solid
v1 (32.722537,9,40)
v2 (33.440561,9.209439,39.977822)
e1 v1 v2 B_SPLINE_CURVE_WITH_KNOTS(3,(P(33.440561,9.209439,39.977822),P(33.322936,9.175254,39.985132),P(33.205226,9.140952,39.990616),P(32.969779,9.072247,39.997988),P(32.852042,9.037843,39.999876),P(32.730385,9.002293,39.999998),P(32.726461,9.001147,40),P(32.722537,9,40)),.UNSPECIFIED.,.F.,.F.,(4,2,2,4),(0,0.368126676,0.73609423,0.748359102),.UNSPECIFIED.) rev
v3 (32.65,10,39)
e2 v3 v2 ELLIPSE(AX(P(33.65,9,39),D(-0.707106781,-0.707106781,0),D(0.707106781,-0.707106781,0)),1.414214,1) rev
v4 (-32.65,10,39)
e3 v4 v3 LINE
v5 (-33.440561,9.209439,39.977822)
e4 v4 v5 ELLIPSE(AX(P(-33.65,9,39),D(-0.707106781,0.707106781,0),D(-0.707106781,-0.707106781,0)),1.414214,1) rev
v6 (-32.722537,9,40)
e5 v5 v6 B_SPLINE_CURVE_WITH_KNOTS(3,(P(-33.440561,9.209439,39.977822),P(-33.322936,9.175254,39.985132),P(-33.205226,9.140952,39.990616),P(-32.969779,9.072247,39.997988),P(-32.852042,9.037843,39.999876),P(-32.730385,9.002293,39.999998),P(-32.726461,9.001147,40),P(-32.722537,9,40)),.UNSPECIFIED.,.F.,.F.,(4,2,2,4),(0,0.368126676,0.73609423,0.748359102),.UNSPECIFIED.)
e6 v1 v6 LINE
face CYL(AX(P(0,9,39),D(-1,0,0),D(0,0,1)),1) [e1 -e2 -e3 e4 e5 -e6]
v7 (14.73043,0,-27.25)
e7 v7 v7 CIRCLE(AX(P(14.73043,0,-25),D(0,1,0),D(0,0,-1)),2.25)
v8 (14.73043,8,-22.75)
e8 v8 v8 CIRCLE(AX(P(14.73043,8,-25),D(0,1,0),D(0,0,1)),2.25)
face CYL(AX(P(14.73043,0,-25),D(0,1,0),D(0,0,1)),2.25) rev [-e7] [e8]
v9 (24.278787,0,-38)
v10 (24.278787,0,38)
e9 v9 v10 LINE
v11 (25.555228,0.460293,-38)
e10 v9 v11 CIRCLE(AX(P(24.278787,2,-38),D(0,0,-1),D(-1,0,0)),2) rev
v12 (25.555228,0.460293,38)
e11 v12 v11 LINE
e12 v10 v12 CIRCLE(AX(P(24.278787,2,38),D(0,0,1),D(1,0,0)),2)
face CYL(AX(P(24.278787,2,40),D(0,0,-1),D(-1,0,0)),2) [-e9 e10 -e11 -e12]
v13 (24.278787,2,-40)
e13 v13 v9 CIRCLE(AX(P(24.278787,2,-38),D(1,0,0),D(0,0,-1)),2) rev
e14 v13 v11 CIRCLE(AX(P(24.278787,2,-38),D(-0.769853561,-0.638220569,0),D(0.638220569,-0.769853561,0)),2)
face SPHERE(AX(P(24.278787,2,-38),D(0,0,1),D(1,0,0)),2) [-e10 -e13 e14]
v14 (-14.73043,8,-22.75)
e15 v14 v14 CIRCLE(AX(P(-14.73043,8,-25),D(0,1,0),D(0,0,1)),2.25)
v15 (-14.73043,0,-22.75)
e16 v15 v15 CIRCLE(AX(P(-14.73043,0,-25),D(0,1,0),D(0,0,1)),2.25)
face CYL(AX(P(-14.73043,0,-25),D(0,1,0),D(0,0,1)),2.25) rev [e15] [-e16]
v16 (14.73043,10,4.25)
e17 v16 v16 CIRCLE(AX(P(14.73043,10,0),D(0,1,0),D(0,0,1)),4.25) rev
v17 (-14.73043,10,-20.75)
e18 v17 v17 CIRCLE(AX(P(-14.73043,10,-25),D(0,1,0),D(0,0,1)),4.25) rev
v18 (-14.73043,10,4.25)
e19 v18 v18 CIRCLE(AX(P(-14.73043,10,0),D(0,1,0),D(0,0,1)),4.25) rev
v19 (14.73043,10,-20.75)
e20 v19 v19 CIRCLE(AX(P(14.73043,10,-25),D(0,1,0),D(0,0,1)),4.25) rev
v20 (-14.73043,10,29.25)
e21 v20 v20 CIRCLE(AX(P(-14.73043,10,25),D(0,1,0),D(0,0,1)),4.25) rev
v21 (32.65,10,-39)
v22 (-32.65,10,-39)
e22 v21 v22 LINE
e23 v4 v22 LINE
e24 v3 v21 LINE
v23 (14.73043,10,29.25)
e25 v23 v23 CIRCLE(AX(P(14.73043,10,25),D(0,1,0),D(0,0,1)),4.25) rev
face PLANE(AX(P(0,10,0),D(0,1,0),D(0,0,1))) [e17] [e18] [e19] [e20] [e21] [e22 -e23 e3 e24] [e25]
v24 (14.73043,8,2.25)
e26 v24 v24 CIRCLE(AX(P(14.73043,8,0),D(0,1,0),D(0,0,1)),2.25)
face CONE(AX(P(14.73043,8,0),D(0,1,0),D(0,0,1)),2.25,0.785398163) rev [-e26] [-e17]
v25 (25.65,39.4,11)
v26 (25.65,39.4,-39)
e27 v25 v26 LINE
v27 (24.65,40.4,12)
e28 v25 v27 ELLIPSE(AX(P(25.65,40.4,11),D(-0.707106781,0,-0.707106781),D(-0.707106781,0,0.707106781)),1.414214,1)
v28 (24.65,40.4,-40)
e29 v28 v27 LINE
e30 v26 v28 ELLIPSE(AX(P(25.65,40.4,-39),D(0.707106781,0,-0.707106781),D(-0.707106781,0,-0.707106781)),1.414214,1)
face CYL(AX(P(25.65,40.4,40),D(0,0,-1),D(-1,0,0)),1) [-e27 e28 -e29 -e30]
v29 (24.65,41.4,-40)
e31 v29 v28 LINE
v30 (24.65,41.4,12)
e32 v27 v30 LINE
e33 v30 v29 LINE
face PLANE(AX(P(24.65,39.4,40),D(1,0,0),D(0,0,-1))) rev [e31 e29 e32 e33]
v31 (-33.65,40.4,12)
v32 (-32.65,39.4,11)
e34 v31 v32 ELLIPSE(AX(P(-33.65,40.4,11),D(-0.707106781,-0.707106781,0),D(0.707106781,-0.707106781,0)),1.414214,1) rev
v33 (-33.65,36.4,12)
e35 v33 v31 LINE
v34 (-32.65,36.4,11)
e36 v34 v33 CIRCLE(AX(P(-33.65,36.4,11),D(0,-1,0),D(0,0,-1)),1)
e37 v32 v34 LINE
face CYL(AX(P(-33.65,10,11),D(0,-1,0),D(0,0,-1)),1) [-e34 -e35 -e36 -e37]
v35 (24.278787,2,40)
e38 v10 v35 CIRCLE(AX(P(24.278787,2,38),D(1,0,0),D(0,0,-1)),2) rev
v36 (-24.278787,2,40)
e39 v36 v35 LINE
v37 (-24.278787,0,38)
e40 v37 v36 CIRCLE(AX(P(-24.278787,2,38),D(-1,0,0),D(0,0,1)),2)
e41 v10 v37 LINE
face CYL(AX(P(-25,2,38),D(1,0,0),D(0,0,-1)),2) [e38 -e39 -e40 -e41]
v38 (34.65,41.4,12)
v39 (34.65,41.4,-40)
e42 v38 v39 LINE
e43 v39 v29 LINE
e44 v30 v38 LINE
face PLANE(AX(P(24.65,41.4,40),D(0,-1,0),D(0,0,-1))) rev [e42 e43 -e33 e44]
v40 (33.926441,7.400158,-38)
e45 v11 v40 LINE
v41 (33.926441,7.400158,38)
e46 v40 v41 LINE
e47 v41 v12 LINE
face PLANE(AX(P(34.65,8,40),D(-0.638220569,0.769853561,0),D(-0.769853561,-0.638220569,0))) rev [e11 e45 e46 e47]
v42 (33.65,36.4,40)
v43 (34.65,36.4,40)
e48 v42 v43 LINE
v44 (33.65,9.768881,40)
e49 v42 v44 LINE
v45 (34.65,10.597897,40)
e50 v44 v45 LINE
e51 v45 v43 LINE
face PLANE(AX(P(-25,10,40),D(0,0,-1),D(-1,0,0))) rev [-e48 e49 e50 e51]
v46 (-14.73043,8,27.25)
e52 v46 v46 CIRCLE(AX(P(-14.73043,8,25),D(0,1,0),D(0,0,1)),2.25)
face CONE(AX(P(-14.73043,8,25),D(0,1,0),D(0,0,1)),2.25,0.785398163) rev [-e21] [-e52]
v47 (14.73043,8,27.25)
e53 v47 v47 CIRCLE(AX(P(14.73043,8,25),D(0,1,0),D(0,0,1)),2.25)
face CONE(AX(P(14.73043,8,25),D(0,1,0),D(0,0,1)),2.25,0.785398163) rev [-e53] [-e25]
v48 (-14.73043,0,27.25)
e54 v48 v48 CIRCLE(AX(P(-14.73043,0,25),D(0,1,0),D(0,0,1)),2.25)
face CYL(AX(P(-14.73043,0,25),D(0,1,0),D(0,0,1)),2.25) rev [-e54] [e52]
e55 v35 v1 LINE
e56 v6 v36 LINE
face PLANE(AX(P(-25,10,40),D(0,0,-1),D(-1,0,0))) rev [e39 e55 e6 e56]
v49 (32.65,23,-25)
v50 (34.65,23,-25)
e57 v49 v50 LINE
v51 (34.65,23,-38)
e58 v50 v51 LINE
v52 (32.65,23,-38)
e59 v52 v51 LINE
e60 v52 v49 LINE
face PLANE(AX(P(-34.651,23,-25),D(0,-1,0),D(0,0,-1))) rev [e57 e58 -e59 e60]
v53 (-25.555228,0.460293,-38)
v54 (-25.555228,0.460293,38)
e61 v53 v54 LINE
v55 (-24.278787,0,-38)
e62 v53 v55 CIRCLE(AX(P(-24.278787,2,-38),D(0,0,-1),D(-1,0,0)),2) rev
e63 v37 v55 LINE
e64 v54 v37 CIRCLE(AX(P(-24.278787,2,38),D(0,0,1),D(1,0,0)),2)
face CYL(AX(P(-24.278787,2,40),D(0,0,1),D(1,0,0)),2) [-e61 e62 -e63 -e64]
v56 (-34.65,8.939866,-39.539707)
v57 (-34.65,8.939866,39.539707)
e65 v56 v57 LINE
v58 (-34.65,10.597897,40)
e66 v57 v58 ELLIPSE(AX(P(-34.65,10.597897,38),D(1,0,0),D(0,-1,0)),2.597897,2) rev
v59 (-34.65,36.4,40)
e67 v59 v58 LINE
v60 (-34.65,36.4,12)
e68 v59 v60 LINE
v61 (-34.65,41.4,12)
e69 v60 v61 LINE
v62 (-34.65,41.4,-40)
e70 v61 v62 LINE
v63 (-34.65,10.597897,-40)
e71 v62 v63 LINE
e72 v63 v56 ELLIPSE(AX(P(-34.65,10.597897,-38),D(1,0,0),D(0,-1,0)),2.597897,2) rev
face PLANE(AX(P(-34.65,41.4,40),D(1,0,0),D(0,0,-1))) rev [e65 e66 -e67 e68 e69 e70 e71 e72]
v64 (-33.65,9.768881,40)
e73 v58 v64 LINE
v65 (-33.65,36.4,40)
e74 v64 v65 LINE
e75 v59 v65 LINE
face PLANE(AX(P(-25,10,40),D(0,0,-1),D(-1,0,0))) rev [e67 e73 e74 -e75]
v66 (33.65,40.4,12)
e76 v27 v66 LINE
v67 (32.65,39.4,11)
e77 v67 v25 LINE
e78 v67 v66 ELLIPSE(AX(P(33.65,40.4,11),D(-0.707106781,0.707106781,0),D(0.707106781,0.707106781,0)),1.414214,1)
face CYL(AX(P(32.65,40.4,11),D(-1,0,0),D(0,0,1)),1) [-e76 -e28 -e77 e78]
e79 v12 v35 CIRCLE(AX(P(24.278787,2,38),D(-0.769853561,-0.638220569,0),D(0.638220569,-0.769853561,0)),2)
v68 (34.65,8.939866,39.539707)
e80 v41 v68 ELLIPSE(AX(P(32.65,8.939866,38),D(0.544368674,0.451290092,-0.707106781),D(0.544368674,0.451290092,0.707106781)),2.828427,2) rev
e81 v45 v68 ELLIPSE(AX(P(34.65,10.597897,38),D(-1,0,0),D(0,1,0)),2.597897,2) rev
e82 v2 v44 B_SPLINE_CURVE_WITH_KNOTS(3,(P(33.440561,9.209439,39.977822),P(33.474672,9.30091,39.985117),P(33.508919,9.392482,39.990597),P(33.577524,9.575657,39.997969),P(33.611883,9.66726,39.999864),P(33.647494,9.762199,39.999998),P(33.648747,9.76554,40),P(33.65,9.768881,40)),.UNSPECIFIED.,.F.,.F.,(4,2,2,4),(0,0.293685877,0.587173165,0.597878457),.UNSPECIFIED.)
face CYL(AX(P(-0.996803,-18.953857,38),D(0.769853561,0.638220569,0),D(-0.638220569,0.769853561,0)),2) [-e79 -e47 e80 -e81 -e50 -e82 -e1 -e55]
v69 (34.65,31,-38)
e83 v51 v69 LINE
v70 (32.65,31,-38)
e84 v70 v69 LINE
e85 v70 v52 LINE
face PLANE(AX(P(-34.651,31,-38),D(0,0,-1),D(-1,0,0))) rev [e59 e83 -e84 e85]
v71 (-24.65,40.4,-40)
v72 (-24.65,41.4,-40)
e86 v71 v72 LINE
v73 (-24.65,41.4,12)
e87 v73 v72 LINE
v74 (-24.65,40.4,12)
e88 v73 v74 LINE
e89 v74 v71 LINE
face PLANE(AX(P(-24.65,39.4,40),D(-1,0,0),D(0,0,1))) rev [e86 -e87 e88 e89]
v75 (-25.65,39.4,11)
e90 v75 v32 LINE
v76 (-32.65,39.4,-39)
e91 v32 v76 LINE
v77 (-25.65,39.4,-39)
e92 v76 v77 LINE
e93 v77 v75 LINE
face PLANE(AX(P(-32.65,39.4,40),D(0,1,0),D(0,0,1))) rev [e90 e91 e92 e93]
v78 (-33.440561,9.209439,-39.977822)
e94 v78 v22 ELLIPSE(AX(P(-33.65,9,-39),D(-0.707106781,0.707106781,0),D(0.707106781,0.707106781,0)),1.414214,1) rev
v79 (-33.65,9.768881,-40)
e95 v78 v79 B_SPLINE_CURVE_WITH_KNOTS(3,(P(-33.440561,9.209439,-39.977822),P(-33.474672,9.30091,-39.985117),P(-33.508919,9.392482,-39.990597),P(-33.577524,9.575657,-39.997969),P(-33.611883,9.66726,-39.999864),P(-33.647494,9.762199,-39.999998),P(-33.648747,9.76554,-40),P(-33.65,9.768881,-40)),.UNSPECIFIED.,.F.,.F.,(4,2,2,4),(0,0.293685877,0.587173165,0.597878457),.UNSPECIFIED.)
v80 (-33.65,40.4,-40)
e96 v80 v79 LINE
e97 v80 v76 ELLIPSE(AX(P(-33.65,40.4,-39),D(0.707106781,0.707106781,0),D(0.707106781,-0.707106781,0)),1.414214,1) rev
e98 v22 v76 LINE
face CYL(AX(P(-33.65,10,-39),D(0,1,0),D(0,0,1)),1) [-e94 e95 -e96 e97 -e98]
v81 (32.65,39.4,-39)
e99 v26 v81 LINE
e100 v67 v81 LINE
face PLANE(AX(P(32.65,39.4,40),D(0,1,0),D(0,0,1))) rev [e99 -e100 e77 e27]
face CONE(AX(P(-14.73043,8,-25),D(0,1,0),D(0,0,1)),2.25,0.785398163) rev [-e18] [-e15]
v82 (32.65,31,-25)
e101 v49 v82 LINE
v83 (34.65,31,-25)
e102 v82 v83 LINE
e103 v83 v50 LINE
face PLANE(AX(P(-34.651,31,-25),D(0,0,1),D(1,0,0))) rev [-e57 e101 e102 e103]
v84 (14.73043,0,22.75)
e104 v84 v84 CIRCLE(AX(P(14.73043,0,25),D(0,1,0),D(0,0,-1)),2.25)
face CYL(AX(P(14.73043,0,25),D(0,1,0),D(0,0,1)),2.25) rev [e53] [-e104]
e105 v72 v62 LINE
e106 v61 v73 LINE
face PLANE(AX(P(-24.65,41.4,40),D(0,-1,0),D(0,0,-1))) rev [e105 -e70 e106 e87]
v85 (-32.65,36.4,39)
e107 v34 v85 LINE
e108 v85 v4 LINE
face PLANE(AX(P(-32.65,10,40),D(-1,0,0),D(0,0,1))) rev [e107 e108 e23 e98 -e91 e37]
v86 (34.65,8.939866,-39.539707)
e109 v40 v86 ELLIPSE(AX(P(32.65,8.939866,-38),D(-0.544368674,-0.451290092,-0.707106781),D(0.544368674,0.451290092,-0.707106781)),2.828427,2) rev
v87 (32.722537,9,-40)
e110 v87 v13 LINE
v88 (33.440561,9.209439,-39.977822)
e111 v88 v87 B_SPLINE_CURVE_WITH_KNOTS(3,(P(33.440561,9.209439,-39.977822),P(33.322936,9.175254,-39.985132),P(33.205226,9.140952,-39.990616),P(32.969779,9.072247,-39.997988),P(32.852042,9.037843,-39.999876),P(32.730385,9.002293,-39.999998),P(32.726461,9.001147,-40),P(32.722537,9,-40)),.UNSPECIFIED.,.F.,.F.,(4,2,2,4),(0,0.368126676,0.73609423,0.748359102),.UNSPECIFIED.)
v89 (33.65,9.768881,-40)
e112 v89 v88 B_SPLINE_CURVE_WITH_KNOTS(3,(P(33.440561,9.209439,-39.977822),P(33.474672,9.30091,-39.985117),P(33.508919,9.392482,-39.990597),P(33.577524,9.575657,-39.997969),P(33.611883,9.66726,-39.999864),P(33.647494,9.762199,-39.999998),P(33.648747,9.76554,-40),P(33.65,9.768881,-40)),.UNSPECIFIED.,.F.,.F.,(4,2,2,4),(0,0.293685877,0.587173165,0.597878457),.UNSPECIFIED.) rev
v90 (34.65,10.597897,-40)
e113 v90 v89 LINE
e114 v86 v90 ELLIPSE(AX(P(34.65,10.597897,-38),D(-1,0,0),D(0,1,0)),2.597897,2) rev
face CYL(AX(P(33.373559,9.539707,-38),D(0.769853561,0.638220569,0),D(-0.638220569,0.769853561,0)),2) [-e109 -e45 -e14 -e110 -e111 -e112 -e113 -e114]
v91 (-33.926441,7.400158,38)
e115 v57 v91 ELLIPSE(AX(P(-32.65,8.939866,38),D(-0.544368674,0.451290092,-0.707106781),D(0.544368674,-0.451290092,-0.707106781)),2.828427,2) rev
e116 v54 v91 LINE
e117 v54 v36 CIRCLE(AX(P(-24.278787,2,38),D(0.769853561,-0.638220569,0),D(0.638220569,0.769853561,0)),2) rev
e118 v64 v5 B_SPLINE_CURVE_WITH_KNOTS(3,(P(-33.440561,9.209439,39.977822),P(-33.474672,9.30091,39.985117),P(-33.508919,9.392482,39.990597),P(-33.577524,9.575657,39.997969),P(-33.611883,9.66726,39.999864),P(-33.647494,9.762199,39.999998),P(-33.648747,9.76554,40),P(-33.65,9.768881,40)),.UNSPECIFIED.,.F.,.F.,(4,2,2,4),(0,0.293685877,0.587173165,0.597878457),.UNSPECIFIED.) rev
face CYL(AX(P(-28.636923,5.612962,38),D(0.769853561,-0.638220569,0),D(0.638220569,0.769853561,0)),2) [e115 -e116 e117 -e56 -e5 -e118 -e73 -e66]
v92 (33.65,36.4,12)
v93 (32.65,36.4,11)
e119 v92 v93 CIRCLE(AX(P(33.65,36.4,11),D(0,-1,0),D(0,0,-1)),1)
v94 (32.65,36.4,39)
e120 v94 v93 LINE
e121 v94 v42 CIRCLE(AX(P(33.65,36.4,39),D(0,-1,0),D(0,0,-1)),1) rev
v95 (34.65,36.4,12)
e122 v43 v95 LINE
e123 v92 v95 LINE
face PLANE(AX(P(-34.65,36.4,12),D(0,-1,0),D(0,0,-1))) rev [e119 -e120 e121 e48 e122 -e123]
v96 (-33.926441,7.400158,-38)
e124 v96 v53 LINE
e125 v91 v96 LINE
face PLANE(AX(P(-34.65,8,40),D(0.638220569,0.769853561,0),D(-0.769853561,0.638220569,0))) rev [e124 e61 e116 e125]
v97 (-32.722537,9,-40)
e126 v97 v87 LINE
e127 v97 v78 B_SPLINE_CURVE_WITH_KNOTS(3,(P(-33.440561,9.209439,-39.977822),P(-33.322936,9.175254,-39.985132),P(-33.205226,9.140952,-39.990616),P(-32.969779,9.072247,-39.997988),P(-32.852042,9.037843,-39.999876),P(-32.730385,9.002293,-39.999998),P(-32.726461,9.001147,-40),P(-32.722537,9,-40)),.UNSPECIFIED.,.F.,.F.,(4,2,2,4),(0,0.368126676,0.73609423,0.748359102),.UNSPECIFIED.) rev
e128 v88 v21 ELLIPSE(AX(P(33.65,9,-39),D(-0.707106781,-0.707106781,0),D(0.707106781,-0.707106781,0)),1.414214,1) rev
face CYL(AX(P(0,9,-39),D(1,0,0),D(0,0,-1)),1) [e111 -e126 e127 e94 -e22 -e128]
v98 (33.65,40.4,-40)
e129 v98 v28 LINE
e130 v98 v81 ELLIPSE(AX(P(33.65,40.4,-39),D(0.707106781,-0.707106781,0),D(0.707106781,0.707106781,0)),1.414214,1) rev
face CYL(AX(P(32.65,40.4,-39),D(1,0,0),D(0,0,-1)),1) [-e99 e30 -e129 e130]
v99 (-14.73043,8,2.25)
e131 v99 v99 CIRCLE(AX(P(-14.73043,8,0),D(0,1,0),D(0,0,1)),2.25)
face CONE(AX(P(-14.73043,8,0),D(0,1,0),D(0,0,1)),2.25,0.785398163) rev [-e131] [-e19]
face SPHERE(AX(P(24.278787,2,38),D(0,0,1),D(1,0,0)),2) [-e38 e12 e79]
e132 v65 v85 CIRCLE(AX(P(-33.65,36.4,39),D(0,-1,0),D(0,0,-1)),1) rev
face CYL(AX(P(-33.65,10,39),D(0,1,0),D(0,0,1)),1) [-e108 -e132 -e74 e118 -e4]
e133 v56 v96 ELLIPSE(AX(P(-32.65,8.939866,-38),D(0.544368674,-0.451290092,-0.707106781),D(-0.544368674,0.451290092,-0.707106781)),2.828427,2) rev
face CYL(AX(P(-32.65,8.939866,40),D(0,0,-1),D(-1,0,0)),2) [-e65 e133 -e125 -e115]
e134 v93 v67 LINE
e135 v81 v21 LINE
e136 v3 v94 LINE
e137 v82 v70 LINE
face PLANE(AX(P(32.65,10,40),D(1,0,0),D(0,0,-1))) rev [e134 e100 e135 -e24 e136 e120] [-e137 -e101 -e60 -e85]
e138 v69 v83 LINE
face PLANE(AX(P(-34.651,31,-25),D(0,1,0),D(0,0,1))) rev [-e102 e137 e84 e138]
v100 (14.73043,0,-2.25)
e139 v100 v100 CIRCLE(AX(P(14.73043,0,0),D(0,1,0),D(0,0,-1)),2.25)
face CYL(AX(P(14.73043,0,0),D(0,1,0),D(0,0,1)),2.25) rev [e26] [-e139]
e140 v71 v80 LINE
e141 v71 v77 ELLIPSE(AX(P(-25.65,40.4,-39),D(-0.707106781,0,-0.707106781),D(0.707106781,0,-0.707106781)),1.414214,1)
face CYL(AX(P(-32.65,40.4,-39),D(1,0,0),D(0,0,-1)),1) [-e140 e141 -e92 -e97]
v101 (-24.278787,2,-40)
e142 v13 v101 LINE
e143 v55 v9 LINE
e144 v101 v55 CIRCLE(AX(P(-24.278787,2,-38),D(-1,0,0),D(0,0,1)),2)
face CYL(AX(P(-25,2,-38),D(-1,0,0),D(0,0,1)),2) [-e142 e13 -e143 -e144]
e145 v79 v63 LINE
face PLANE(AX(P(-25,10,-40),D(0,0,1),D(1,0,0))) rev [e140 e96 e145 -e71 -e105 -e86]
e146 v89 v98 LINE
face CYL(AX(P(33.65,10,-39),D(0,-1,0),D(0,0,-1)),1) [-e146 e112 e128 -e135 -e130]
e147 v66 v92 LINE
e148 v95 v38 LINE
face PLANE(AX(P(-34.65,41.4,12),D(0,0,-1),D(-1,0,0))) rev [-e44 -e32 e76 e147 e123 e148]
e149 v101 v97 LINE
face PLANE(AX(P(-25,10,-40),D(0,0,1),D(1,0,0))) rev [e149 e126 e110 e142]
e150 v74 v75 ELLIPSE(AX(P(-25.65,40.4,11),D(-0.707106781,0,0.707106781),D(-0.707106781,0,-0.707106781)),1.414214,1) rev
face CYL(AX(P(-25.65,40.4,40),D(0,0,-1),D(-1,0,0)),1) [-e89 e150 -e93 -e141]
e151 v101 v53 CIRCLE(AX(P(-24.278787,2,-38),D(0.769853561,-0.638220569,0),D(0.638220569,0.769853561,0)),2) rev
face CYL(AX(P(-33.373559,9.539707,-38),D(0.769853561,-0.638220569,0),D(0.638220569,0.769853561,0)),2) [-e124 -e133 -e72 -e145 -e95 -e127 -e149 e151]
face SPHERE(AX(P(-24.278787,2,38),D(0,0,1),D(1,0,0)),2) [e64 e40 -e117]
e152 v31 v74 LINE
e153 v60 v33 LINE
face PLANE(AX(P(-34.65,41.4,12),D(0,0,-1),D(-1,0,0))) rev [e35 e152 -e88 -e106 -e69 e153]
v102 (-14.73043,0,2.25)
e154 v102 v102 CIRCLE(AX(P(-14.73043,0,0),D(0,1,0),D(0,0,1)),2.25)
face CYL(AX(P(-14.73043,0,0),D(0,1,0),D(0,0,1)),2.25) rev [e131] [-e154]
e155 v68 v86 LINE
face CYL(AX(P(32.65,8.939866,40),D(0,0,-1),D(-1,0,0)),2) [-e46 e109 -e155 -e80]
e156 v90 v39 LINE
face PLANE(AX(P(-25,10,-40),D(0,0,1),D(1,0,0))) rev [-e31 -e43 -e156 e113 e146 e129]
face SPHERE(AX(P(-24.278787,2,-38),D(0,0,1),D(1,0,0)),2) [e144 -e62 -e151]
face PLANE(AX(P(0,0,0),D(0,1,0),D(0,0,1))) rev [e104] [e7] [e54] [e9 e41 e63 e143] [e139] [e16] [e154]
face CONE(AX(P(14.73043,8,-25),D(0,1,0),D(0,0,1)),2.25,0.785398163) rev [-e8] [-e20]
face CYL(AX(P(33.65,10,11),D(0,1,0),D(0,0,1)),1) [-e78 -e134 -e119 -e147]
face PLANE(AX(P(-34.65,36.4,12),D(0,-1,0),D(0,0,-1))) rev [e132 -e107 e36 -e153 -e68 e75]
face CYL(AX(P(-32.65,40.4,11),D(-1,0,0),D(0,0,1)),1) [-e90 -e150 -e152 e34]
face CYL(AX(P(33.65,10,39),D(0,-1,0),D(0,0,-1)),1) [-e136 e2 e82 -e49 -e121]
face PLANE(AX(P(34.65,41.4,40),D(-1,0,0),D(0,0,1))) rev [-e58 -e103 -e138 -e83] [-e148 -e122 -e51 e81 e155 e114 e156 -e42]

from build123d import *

# Parameters (mm, degrees)
SKETCH1_W               = 50
SKETCH1_H               = 80
BOSS_EXTRUDE1_DEPTH     = 10
SKETCH2_R               = 2.25
CUT_EXTRUDE1_DEPTH      = 49.218253805
CHAMFER1_SIZE           = 2
BOSS_EXTRUDE2_DEPTH     = 40
CUT_EXTRUDE2_DEPTH      = 68.19064295
CUT_EXTRUDE2_DEPTH_BACK = 68.19064295
SKETCH4_W               = 28
SKETCH4_H               = 5
CUT_EXTRUDE3_REACH      = 92.091
SKETCH5_W               = 13
SKETCH5_H               = 8
FILLET1_R               = 1
FILLET2_R               = 2


with BuildPart() as part:
    # Sketch1 → Boss-Extrude1 (new body)
    with BuildSketch(Plane(origin=(0, 0, 0), x_dir=(1, 0, 0), z_dir=(0, 1, 0))):
        Rectangle(SKETCH1_W, SKETCH1_H)
    extrude(amount=BOSS_EXTRUDE1_DEPTH)

    # Sketch2 → Cut-Extrude1 (cut, through all)
    with BuildSketch(Plane(origin=(0, 10, 0), x_dir=(1, 0, 0), z_dir=(0, 1, 0))):
        with Locations(Location((-14.730430452, 0, 0), (0, 0, 270))):
            Circle(SKETCH2_R)
        with Locations(Location((-14.730430452, 25, 0), (0, 0, 270))):
            Circle(SKETCH2_R)
        with Locations(Location((-14.730430452, -25, 0), (0, 0, 270))):
            Circle(SKETCH2_R)
        with Locations(Location((14.730430452, -25, 0), (0, 0, 90))):
            Circle(SKETCH2_R)
        with Locations(Location((14.730430452, 0, 0), (0, 0, 90))):
            Circle(SKETCH2_R)
        with Locations(Location((14.730430452, 25, 0), (0, 0, 90))):
            Circle(SKETCH2_R)
    extrude(amount=-CUT_EXTRUDE1_DEPTH, mode=Mode.SUBTRACT)

    # Chamfer1
    chamfer1_edges = [part.edges().sort_by_distance(p)[0] for p in [
        (-14.730430452, 10, -27.25),
        (-14.730430452, 10, 22.75),
        (14.730430452, 10, 27.25),
        (14.730430452, 10, 2.25),
        (14.730430452, 10, -22.75),
        (-14.730430452, 10, -2.25),
    ]]
    chamfer(chamfer1_edges, length=CHAMFER1_SIZE)

    # Sketch3 → Boss-Extrude2 (add, symmetric)
    with BuildSketch(Plane.XY):
        Polygon((-25, 10), (-32.65, 10), (-32.65, 39.4), (-24.65, 39.4), (-24.65, 41.4), (-34.65, 41.4), (-34.65, 8), (-25, 0), align=None)
        Polygon((34.65, 8), (25, 0), (25, 10), (32.65, 10), (32.65, 39.4), (24.65, 39.4), (24.65, 41.4), (34.65, 41.4), align=None)
    extrude(amount=BOSS_EXTRUDE2_DEPTH, both=True)

    # Sketch4 → Cut-Extrude2 (cut, two sides: drawn at the far end of the back side and taken through both)
    with BuildSketch(Plane(origin=(0, 0, 0), x_dir=(0, 0, -1), z_dir=(1, 0, 0)).offset(-CUT_EXTRUDE2_DEPTH_BACK)):
        with Locations((-26, 38.9)):
            Rectangle(SKETCH4_W, SKETCH4_H)
    extrude(amount=CUT_EXTRUDE2_DEPTH + CUT_EXTRUDE2_DEPTH_BACK, mode=Mode.SUBTRACT)

    # Sketch5 → Cut-Extrude3 (cut, up to next)
    with BuildSketch(Plane(origin=(34.65, 0, 0), x_dir=(0, 0, -1), z_dir=(1, 0, 0)), mode=Mode.PRIVATE) as cut_extrude3_sk1:
        with Locations((31.5, 27)):
            Rectangle(SKETCH5_W, SKETCH5_H)
    cut_extrude3_tool1 = extrude(cut_extrude3_sk1.sketch, amount=-CUT_EXTRUDE3_REACH, mode=Mode.PRIVATE) & part.part
    add(cut_extrude3_tool1.solids().sort_by_distance((34.65, 27, -31.5))[0], mode=Mode.SUBTRACT)

    # Fillet1
    fillet1_edges = [part.edges().sort_by_distance(p)[0] for p in [
        (32.65, 23.2, 40),
        (32.65, 37.9, 12),
        (24.65, 39.4, -14),
        (-24.65, 39.4, -14),
        (-28.65, 39.4, 12),
        (-32.65, 37.9, 12),
        (28.65, 39.4, 12),
        (0, 10, 40),
        (-32.65, 24.7, -40),
        (-28.65, 39.4, -40),
        (-32.65, 23.2, 40),
        (0, 10, -40),
        (28.65, 39.4, -40),
        (32.65, 24.7, -40),
    ]]
    fillet(fillet1_edges, radius=FILLET1_R)

    # Fillet2
    # the kernel refuses this fillet: 2 mm, written as the material it takes off along each edge
    with BuildSketch(Plane(origin=(-24.278787146, 2, 38), x_dir=(0, -1, 0), z_dir=(0, 0, 1))) as fillet2_piece_1_section:
        Polygon((0, 0), (FILLET2_R * 1.02, 0), (FILLET2_R * 1.02, -FILLET2_R * 0.367818555432), (FILLET2_R * 0.785250632337, -FILLET2_R * 0.650984980176), align=None)
    fillet2_piece_1 = extrude(amount=FILLET2_R * 1.02, mode=Mode.PRIVATE)
    fillet2_piece_1 = fillet2_piece_1 - Plane(origin=(-24.278787146, 2, 38), x_dir=(0.3392244381566016, 0.9407054696116836, 0), z_dir=(0, 0, 1)) * Sphere(FILLET2_R, mode=Mode.PRIVATE)
    add(fillet2_piece_1, mode=Mode.SUBTRACT)
    with BuildSketch(Plane(origin=(24.278787146, 2, -38), x_dir=(0, -1, 0), z_dir=(0, 0, -1))) as fillet2_piece_2_section:
        Polygon((0, 0), (FILLET2_R * 1.02, 0), (FILLET2_R * 1.02, -FILLET2_R * 0.367818555432), (FILLET2_R * 0.785250632337, -FILLET2_R * 0.650984980176), align=None)
    fillet2_piece_2 = extrude(amount=FILLET2_R * 1.02, mode=Mode.PRIVATE)
    fillet2_piece_2 = fillet2_piece_2 - Plane(origin=(24.278787146, 2, -38), x_dir=(-0.3392244381566016, 0.9407054696116836, 0), z_dir=(0, 0, -1)) * Sphere(FILLET2_R, mode=Mode.PRIVATE)
    add(fillet2_piece_2, mode=Mode.SUBTRACT)
    with BuildSketch(Plane(origin=(24.278787146, 2, 38), x_dir=(0, -1, 0), z_dir=(0, 0, 1))) as fillet2_piece_3_section:
        Polygon((0, 0), (FILLET2_R * 1.02, 0), (FILLET2_R * 1.02, FILLET2_R * 0.367818555432), (FILLET2_R * 0.785250632337, FILLET2_R * 0.650984980176), align=None)
    fillet2_piece_3 = extrude(amount=FILLET2_R * 1.02, mode=Mode.PRIVATE)
    fillet2_piece_3 = fillet2_piece_3 - Plane(origin=(24.278787146, 2, 38), x_dir=(-0.3392244381566016, 0.9407054696116836, 0), z_dir=(0, 0, 1)) * Sphere(FILLET2_R, mode=Mode.PRIVATE)
    add(fillet2_piece_3, mode=Mode.SUBTRACT)
    with BuildSketch(Plane(origin=(-24.278787146, 2, -38), x_dir=(0, -1, 0), z_dir=(0, 0, -1))) as fillet2_piece_4_section:
        Polygon((0, 0), (FILLET2_R * 1.02, 0), (FILLET2_R * 1.02, FILLET2_R * 0.367818555432), (FILLET2_R * 0.785250632337, FILLET2_R * 0.650984980176), align=None)
    fillet2_piece_4 = extrude(amount=FILLET2_R * 1.02, mode=Mode.PRIVATE)
    fillet2_piece_4 = fillet2_piece_4 - Plane(origin=(-24.278787146, 2, -38), x_dir=(0.3392244381566016, 0.9407054696116836, 0), z_dir=(0, 0, -1)) * Sphere(FILLET2_R, mode=Mode.PRIVATE)
    add(fillet2_piece_4, mode=Mode.SUBTRACT)
    with BuildSketch(Plane(origin=(-38.499267806, 11.191102844, 40), x_dir=(0.6382205687997308, 0.7698535611146761, -3.5527136788005e-15), z_dir=(0.7698535611146761, -0.6382205687997308, 0)), Plane(origin=(-38.499267806, 11.191102844, -40), x_dir=(0, 0, 1), z_dir=(0.7698535611146761, -0.6382205687997308, 0))) as fillet2_piece_5:
        with BuildLine():
            CenterArc((FILLET2_R, -FILLET2_R), FILLET2_R, 90, 90)
            Line((0, -FILLET2_R), (-FILLET2_R * 0.02, -FILLET2_R))
            Line((-FILLET2_R * 0.02, -FILLET2_R), (-FILLET2_R * 0.02, FILLET2_R * 0.02))
            Line((-FILLET2_R * 0.02, FILLET2_R * 0.02), (FILLET2_R, FILLET2_R * 0.02))
            Line((FILLET2_R, FILLET2_R * 0.02), (FILLET2_R, 0))
        make_face()
    extrude(amount=16.813638561, mode=Mode.SUBTRACT)
    with BuildSketch(Plane(origin=(38.499267806, 11.191102844, -40), x_dir=(0, 0, 1), z_dir=(-0.7698535611146761, -0.6382205687997308, 0)), Plane(origin=(38.499267806, 11.191102844, 40), x_dir=(-0.6382205687997308, 0.7698535611146761, -3.5527136788005e-15), z_dir=(-0.7698535611146761, -0.6382205687997308, 0))) as fillet2_piece_6:
        with BuildLine():
            CenterArc((FILLET2_R, FILLET2_R), FILLET2_R, 180, 90)
            Line((0, FILLET2_R), (-FILLET2_R * 0.02, FILLET2_R))
            Line((-FILLET2_R * 0.02, FILLET2_R), (-FILLET2_R * 0.02, -FILLET2_R * 0.02))
            Line((-FILLET2_R * 0.02, -FILLET2_R * 0.02), (FILLET2_R, -FILLET2_R * 0.02))
            Line((FILLET2_R, -FILLET2_R * 0.02), (FILLET2_R, 0))
        make_face()
    extrude(amount=16.813638561, mode=Mode.SUBTRACT)
    with BuildSketch(Plane(origin=(-24.278787146, 0, -40), x_dir=(0, 0, 1), z_dir=(1, 0, 0)), Plane(origin=(24.278787146, 0, 40), x_dir=(0, 0, -1), z_dir=(-1, 0, 0))) as fillet2_piece_7:
        with BuildLine():
            CenterArc((FILLET2_R, -FILLET2_R), FILLET2_R, 90, 90)
            Line((0, -FILLET2_R), (-FILLET2_R * 0.02, -FILLET2_R))
            Line((-FILLET2_R * 0.02, -FILLET2_R), (-FILLET2_R * 0.02, FILLET2_R * 0.02))
            Line((-FILLET2_R * 0.02, FILLET2_R * 0.02), (FILLET2_R, FILLET2_R * 0.02))
            Line((FILLET2_R, FILLET2_R * 0.02), (FILLET2_R, 0))
        make_face()
    extrude(amount=48.557574292, mode=Mode.SUBTRACT)
    with BuildSketch(Plane(origin=(-34.65, 8, 42.349663946), x_dir=(0, 1, 0), z_dir=(0, 0, -1)), Plane(origin=(34.65, 8, -42.349663946), x_dir=(0, 1, 0), z_dir=(0, 0, 1))) as fillet2_piece_8:
        with BuildLine():
            CenterArc((FILLET2_R * 0.469932789135, FILLET2_R), FILLET2_R, 219.659259409, 50.340740591)
            Line((-FILLET2_R * 0.299920771979, FILLET2_R * 0.3617794312), (-FILLET2_R * 0.315317843202, FILLET2_R * 0.349015019824))
            Line((-FILLET2_R * 0.315317843202, FILLET2_R * 0.349015019824), (-FILLET2_R * 0.0093986557827, -FILLET2_R * 0.02))
            Line((-FILLET2_R * 0.0093986557827, -FILLET2_R * 0.02), (FILLET2_R * 0.469932789135, -FILLET2_R * 0.02))
            Line((FILLET2_R * 0.469932789135, -FILLET2_R * 0.02), (FILLET2_R * 0.469932789135, 0))
        make_face()
    extrude(amount=84.699327891, mode=Mode.SUBTRACT)
    with BuildSketch(Plane(origin=(25, 0, -38), x_dir=(-1, 0, 0), z_dir=(0, 0, 1)), Plane(origin=(-25, 0, 38), x_dir=(1, 0, 0), z_dir=(0, 0, -1))) as fillet2_piece_9:
        with BuildLine():
            CenterArc((FILLET2_R * 0.360606426894, -FILLET2_R), FILLET2_R, 90, 39.659259409)
            Line((-FILLET2_R * 0.277614141905, -FILLET2_R * 0.230146438885), (-FILLET2_R * 0.290378553281, -FILLET2_R * 0.214749367663))
            Line((-FILLET2_R * 0.290378553281, -FILLET2_R * 0.214749367663), (-FILLET2_R * 0.00721212853789, FILLET2_R * 0.02))
            Line((-FILLET2_R * 0.00721212853789, FILLET2_R * 0.02), (FILLET2_R * 0.360606426894, FILLET2_R * 0.02))
            Line((FILLET2_R * 0.360606426894, FILLET2_R * 0.02), (FILLET2_R * 0.360606426894, 0))
        make_face()
    extrude(amount=76, mode=Mode.SUBTRACT)


solid = part.part
